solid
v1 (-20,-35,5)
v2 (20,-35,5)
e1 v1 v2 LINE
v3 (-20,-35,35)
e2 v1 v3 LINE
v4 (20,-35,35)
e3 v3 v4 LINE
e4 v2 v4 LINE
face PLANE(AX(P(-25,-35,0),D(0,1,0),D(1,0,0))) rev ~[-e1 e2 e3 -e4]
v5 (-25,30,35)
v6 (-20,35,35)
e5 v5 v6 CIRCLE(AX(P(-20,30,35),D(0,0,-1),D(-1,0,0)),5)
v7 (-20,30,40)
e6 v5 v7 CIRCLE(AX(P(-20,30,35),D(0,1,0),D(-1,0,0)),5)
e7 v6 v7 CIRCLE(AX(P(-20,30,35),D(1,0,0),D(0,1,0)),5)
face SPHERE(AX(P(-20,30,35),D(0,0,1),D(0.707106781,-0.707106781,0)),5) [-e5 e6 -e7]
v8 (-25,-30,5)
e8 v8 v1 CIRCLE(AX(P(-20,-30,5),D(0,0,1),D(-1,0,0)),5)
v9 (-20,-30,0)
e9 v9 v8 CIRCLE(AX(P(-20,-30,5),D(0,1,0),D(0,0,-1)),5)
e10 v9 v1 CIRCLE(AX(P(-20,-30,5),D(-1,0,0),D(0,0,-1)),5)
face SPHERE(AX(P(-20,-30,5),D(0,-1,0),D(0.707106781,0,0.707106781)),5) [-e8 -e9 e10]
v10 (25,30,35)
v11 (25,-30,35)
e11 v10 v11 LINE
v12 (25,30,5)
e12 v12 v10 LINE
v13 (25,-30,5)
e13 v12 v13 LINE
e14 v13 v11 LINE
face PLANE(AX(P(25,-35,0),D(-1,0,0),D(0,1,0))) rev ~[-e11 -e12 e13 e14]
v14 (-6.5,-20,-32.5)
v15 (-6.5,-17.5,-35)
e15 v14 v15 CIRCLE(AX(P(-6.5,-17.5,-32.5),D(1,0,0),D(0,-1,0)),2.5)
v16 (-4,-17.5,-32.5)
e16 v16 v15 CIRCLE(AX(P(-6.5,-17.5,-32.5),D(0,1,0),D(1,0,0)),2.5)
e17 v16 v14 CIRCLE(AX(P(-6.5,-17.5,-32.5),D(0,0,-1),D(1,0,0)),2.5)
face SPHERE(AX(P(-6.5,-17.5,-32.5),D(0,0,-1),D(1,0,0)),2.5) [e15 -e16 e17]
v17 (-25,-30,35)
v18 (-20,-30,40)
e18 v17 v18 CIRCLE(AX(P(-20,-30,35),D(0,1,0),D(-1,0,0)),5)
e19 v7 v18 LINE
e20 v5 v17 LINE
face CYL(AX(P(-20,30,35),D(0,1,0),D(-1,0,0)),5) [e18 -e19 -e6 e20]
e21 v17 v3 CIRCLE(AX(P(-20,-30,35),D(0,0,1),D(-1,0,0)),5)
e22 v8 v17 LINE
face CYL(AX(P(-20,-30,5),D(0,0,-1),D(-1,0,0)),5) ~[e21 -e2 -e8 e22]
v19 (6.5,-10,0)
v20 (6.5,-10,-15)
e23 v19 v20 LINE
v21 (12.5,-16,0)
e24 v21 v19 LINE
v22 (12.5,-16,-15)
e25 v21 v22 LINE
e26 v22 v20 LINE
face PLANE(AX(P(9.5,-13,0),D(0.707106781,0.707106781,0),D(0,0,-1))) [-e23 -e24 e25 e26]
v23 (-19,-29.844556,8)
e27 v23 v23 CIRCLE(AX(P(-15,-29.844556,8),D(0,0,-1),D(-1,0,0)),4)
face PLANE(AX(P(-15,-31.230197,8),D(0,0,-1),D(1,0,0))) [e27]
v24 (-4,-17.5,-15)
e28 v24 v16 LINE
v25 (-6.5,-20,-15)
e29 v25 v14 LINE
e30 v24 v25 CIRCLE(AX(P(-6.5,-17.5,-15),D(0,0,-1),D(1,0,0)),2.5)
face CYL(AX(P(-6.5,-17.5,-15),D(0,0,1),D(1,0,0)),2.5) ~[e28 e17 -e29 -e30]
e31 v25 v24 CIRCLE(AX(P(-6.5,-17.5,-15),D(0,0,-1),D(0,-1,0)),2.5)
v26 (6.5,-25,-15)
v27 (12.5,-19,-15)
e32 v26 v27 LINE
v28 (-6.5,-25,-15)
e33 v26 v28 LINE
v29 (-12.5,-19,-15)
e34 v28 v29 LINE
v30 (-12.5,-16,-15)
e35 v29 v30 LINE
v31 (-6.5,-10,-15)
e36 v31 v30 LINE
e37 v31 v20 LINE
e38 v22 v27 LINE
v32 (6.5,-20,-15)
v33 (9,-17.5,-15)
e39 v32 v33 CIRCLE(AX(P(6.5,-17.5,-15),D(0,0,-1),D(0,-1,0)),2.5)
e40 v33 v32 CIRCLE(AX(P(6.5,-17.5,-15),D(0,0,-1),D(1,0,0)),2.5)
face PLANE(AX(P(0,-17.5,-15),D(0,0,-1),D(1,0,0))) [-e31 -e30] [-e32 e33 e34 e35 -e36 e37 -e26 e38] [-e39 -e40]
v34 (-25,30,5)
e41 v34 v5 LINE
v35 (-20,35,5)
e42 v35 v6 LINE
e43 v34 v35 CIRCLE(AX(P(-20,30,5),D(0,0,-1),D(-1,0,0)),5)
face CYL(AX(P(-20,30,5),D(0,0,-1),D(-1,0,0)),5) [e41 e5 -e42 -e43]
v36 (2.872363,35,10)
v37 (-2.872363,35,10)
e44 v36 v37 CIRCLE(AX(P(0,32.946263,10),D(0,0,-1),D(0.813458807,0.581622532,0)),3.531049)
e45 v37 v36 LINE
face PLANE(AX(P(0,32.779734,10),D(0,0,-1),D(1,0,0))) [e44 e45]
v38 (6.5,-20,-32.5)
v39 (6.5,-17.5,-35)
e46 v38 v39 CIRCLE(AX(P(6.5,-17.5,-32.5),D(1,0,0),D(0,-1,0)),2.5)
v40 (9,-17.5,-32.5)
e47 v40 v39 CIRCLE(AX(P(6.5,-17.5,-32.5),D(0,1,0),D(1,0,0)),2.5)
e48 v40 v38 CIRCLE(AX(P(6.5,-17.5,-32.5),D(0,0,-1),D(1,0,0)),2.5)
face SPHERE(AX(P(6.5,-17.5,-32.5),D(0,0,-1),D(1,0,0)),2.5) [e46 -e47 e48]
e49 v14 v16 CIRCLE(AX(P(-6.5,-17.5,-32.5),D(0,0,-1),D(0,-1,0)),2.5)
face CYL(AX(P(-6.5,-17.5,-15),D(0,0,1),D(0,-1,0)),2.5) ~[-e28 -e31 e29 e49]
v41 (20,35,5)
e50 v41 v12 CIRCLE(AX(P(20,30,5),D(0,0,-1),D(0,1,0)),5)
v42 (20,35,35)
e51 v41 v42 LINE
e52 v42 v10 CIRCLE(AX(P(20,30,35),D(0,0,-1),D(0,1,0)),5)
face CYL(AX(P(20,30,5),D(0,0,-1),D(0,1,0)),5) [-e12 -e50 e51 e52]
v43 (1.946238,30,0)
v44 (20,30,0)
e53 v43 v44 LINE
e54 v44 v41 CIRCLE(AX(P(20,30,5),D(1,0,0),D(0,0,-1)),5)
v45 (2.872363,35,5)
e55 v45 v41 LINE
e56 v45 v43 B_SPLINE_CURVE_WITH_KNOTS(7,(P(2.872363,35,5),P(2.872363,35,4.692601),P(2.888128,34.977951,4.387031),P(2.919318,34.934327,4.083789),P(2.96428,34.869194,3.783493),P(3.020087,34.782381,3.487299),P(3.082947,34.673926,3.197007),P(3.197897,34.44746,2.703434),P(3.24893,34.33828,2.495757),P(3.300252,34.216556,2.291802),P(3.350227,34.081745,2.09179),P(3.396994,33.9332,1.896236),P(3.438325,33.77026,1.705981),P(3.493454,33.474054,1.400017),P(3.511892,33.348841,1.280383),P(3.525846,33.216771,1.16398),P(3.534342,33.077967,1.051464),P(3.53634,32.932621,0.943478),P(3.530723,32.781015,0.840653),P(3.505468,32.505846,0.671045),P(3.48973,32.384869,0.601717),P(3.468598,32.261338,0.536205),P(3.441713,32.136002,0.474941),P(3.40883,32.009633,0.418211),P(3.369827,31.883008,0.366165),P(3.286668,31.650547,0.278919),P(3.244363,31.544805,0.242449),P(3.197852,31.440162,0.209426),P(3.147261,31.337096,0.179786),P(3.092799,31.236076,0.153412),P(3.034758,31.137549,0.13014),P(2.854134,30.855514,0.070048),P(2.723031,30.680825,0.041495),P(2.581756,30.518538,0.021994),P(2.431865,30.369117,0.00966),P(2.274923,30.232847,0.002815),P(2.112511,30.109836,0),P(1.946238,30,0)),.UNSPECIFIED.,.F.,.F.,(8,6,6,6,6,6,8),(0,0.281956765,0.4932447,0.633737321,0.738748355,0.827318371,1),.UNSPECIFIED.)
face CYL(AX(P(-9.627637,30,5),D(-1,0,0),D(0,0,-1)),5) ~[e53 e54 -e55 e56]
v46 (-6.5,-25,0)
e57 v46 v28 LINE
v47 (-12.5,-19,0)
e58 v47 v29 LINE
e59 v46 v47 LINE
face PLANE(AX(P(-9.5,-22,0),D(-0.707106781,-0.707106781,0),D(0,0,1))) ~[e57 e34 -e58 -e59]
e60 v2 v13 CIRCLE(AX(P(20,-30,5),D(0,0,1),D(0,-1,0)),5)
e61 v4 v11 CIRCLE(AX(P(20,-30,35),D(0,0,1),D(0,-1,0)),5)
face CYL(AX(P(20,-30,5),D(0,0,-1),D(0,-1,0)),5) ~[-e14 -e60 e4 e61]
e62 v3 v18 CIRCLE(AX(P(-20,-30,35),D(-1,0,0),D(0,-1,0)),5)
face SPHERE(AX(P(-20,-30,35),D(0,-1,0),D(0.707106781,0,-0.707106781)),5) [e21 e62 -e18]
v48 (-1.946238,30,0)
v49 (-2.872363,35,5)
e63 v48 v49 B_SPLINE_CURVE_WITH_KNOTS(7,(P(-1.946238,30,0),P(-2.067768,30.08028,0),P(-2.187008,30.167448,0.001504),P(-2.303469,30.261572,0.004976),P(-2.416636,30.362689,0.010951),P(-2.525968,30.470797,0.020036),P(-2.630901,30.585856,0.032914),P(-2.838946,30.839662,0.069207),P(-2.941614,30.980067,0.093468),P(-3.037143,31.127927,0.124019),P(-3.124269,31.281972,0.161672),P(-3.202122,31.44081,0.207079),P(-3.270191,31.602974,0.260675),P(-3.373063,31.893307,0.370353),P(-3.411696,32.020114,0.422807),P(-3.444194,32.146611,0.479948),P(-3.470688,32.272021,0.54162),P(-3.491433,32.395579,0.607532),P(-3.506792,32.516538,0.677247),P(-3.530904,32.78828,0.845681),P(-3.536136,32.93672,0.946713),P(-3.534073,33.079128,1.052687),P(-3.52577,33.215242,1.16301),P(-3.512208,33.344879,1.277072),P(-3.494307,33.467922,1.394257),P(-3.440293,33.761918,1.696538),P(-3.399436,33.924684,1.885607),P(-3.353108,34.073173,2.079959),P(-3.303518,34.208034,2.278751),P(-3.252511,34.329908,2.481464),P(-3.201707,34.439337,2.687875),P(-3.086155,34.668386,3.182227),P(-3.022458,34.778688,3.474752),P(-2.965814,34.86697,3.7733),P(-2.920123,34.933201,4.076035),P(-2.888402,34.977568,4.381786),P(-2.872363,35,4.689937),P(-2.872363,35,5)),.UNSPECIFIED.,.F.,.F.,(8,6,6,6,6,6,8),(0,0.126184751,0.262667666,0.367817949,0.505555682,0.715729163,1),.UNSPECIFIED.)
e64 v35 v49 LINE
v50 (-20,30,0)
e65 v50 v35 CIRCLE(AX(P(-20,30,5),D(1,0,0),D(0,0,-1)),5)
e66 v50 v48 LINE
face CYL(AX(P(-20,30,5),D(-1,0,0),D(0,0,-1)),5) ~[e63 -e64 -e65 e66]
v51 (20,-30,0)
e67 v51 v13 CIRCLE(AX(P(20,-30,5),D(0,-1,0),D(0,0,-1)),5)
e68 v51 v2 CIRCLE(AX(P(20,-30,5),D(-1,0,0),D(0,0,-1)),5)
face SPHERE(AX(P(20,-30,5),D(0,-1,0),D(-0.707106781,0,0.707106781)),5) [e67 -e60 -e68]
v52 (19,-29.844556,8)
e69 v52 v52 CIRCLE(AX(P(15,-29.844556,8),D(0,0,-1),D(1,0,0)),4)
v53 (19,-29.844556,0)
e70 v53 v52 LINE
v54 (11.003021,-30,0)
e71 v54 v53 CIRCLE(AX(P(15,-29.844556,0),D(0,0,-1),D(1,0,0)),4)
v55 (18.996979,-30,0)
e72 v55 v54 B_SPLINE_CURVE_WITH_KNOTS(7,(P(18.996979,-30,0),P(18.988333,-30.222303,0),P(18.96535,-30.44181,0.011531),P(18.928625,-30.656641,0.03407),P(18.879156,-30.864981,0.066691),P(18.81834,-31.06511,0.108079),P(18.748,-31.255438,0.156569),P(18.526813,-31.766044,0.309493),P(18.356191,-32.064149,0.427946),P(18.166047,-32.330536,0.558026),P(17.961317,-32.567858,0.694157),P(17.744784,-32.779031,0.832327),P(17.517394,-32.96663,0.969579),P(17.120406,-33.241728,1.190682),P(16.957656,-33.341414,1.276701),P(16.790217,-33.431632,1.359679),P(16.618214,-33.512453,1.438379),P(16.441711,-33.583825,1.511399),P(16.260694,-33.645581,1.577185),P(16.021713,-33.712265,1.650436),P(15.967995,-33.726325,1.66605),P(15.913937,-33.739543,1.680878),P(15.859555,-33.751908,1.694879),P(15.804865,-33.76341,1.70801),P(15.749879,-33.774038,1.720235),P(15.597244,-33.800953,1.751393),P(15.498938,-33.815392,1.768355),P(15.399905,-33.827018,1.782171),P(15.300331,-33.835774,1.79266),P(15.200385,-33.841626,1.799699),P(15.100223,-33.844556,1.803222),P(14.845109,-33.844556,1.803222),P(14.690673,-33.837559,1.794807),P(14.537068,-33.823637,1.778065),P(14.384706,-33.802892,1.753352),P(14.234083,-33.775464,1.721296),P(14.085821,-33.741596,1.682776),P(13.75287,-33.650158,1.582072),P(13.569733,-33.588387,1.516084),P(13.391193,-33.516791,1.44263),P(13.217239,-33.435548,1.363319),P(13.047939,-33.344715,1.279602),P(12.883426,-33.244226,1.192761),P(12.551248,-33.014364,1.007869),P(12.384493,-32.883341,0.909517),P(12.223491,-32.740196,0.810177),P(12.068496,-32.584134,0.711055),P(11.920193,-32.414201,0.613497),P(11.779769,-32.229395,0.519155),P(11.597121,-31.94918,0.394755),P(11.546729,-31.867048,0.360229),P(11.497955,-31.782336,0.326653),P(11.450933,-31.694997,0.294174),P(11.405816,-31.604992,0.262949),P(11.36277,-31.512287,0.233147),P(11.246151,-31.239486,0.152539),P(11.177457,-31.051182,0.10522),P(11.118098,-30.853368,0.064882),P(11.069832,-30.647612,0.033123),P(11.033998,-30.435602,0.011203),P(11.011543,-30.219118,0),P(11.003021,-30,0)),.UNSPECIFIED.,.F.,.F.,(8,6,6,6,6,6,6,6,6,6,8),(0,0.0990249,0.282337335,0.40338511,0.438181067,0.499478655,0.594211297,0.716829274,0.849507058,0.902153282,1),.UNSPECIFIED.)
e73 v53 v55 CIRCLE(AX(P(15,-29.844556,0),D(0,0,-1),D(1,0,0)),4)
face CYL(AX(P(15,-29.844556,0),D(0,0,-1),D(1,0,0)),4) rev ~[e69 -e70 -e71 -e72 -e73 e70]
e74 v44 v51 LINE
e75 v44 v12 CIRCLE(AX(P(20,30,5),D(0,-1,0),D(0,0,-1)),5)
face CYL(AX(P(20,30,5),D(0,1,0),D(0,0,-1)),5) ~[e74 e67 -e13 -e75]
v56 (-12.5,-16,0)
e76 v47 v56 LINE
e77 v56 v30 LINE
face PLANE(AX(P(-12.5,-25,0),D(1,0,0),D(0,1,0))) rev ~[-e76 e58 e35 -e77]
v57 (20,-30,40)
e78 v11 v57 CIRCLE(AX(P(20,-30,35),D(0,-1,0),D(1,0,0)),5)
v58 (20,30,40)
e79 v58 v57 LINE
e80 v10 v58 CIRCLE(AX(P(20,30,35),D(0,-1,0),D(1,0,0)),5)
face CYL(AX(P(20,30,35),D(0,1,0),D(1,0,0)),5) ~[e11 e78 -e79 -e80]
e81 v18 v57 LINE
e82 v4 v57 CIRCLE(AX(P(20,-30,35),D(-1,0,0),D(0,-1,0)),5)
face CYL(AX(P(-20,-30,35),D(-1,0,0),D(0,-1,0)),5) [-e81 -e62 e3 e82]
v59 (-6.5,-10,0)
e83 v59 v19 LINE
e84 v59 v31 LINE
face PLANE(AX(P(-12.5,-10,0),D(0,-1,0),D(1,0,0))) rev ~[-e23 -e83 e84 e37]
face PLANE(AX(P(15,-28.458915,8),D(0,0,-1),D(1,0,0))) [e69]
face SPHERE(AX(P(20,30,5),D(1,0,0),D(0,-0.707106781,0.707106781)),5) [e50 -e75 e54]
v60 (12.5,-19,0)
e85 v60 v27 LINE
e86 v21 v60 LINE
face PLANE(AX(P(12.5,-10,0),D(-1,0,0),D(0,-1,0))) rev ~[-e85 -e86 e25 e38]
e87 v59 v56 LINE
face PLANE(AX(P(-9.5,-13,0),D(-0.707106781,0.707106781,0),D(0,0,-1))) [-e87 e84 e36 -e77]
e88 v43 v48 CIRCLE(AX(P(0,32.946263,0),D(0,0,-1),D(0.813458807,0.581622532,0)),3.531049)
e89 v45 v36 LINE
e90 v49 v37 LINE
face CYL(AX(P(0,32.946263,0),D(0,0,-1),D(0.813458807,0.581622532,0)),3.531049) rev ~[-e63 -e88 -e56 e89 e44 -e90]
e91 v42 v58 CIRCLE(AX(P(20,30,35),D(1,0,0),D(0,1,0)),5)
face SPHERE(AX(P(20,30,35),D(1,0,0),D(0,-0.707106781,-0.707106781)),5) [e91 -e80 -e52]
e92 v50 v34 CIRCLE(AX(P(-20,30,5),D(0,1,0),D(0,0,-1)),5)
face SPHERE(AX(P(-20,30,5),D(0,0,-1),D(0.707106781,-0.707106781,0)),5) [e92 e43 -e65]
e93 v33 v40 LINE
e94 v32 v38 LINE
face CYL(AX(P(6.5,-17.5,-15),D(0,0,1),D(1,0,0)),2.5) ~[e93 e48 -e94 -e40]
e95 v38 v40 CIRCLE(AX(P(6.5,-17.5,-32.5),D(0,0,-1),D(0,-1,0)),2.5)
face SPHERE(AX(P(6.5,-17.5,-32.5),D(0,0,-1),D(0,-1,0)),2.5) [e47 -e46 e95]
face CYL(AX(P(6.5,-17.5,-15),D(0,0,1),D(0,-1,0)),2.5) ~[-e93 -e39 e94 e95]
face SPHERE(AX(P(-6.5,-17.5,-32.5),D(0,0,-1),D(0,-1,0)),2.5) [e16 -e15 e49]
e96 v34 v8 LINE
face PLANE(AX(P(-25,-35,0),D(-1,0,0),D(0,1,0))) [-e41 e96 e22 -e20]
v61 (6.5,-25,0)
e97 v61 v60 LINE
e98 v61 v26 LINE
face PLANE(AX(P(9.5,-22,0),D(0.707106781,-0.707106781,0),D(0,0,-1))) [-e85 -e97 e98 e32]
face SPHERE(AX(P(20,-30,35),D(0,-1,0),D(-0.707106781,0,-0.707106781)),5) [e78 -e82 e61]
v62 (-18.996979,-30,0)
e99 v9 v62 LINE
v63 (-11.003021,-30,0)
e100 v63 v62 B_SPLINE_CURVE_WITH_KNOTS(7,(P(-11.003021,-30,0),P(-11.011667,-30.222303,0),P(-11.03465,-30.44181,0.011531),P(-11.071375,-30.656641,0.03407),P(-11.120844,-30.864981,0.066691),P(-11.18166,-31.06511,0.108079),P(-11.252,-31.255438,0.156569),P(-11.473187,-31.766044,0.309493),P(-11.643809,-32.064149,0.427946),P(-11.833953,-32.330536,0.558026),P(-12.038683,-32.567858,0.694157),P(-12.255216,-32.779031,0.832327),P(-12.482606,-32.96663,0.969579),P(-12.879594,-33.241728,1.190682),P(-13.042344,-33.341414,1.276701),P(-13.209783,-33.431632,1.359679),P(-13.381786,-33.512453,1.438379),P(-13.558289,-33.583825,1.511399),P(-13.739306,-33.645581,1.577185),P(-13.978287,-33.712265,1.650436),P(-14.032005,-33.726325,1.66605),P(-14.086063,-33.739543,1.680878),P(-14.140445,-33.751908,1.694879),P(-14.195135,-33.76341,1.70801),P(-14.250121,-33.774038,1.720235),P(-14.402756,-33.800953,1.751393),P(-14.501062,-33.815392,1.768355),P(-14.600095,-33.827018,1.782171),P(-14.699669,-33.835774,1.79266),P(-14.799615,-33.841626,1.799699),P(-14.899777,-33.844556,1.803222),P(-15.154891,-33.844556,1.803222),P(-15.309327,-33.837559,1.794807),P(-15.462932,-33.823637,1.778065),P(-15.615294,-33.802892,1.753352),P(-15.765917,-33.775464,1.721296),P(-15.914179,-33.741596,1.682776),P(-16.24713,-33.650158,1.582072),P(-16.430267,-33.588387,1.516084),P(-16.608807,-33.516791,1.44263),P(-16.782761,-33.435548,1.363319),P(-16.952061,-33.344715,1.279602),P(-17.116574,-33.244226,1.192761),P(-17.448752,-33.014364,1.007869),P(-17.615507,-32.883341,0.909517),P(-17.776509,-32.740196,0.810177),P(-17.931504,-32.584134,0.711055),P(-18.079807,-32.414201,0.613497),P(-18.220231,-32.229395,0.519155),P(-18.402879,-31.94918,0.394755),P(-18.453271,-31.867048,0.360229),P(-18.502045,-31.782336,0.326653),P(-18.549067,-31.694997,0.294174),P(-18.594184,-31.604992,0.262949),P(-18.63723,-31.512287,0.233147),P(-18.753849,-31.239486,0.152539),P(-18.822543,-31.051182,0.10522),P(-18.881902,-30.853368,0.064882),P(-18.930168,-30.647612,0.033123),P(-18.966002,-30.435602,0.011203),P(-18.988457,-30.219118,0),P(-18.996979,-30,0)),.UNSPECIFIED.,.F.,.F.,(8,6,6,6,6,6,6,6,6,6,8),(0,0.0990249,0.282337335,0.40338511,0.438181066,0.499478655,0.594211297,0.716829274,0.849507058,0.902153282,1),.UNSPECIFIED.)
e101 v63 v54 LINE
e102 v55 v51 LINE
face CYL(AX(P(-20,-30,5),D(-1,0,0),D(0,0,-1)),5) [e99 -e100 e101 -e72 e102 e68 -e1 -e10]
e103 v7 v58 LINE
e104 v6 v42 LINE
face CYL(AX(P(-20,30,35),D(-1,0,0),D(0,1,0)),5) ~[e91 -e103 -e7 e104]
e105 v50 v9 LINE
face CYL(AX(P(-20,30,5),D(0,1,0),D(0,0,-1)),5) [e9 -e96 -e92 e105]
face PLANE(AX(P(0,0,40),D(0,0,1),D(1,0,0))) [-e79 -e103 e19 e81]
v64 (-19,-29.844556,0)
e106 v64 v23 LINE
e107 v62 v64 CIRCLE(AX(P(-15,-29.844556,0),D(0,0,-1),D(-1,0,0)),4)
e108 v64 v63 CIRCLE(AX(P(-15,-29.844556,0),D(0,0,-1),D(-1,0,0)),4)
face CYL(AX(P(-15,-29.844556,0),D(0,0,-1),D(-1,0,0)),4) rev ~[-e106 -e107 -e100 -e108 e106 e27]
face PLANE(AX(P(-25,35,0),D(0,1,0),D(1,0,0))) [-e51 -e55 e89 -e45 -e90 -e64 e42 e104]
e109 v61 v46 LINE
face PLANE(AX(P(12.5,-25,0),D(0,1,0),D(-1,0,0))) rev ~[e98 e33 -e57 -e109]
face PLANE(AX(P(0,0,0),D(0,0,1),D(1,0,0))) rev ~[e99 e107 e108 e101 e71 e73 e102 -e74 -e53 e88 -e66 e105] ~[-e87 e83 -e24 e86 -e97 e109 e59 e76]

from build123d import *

# Parameters (mm, degrees)
F0_W          = 50
F0_H          = 70
F1_DEPTH      = 40
F3_DEPTH      = 15
F4_SIZE       = 6
F6_DEPTH      = 20
F7_DEPTH      = 20
F8_R          = 2.5
F10_DEPTH     = 10
F12_DEPTH     = 8
F13_T1_DEPTH  = 60
F13_T3_DEPTH  = 30
F13_T5_DEPTH  = 29.6276373277
F13_T7_DEPTH  = 29.6276373277
F13_T9_DEPTH  = 40
F13_S13_W     = 5
F13_S13_H     = 5
F13_T14_DEPTH = 5
F13_S19_W     = 5
F13_S19_H     = 5
F13_T20_DEPTH = 5
F13_S25_W     = 5
F13_S25_H     = 5
F13_T26_DEPTH = 5
F13_S31_W     = 5
F13_S31_H     = 5
F13_T32_DEPTH = 5
F13_S37_W     = 5
F13_S37_H     = 5
F13_T38_DEPTH = 5
F13_S43_W     = 5
F13_S43_H     = 5
F13_T44_DEPTH = 5
F13_S49_W     = 5
F13_S49_H     = 5
F13_T50_DEPTH = 5
F13_S55_W     = 5
F13_S55_H     = 5
F13_T56_DEPTH = 5


# Not quite as in the source:
# - a fillet or chamfer that OpenCascade refuses, or shapes differently, is made with other operations: its cross-section is extruded or revolved along the edge and cut away or added


with BuildPart() as f1:
    # F0 (on Top) → F1 (new body)
    with BuildSketch(Plane.XY):
        Rectangle(F0_W, F0_H)
    extrude(amount=F1_DEPTH)

    # F2 (on face) → F3 (join)
    with BuildSketch(Plane(origin=(0, 0, 0), x_dir=(1, 0, 0), z_dir=(0, 0, -1))):
        Polygon((-12.5, 25), (-12.5, 20), (-12.5, 10), (12.5, 10), (12.5, 17.5), (12.5, 25), align=None)
    extrude(amount=F3_DEPTH)

    # F4
    f4_edges = [f1.edges().sort_by_distance(p)[0] for p in [
        (-12.5, -25, -7.5),
        (-12.5, -10, -7.5),
        (12.5, -10, -7.5),
        (12.5, -25, -7.5),
    ]]
    chamfer(f4_edges, length=F4_SIZE)

    # F5 (on face) → F6 (join)
    with BuildSketch(Plane(origin=(0, 0, -15), x_dir=(1, 0, 0), z_dir=(0, 0, -1))):
        with BuildLine():
            ThreePointArc((-4, 17.5), (-4.732233047, 19.267766953), (-6.5, 20))
            ThreePointArc((-6.5, 20), (-8.267766953, 15.732233047), (-4, 17.5))
        make_face()
    extrude(amount=F6_DEPTH)

    # F5 (on face) → F7 (join)
    with BuildSketch(Plane(origin=(0, 0, -15), x_dir=(1, 0, 0), z_dir=(0, 0, -1))):
        with BuildLine():
            ThreePointArc((9, 17.5), (8.267766953, 19.267766953), (6.5, 20))
            ThreePointArc((6.5, 20), (4.732233047, 15.732233047), (9, 17.5))
        make_face()
    extrude(amount=F7_DEPTH)

    # F8
    f8_edges = [f1.edges().sort_by_distance(p)[0] for p in [
        (-9, -17.5, -35),
        (4, -17.5, -35),
    ]]
    fillet(f8_edges, radius=F8_R)

    # F9 (on face) → F10 (cut)
    with BuildSketch(Plane(origin=(0, 0, 0), x_dir=(1, 0, 0), z_dir=(0, 0, -1))):
        with BuildLine():
            Line((-2.8723626723, -35), (2.8723626723, -35))
            ThreePointArc((2.8723626723, -35), (0, -29.4152137969), (-2.8723626723, -35))
        make_face()
    extrude(amount=-F10_DEPTH, mode=Mode.SUBTRACT)

    # F11 (on face) → F12 (cut)
    with BuildSketch(Plane(origin=(0, 0, 0), x_dir=(1, 0, 0), z_dir=(0, 0, -1))):
        with BuildLine():
            ThreePointArc((11, 29.8445560038), (15, 25.8445560038), (19, 29.8445560038))
            Line((19, 29.8445560038), (15, 29.8445560038))
            Line((15, 29.8445560038), (11, 29.8445560038))
        make_face()
        with BuildLine():
            Line((-15, 29.8445560038), (-11, 29.8445560038))
            ThreePointArc((-11, 29.8445560038), (-15, 33.8445560038), (-19, 29.8445560038))
            Line((-19, 29.8445560038), (-15, 29.8445560038))
        make_face()
        with BuildLine():
            ThreePointArc((-19, 29.8445560038), (-15, 25.8445560038), (-11, 29.8445560038))
            Line((-11, 29.8445560038), (-15, 29.8445560038))
            Line((-15, 29.8445560038), (-19, 29.8445560038))
        make_face()
        with BuildLine():
            Line((15, 29.8445560038), (19, 29.8445560038))
            ThreePointArc((19, 29.8445560038), (15, 33.8445560038), (11, 29.8445560038))
            Line((11, 29.8445560038), (15, 29.8445560038))
        make_face()
    extrude(amount=-F12_DEPTH, mode=Mode.SUBTRACT)

    # F13: fillet of radius 5 on 13 edges, made by hand

    # F13_s2 → F13_t1 (cut)
    with BuildSketch(Plane.XZ.offset(-30)):
        with BuildLine():
            ThreePointArc((20, 0), (23.5355339059, 1.4644660941), (25, 5))
            Line((25, 5), (25, 0))
            Line((25, 0), (20, 0))
        make_face()
        with BuildLine():
            ThreePointArc((25, 35), (23.5355339059, 38.5355339059), (20, 40))
            Line((20, 40), (25, 40))
            Line((25, 40), (25, 35))
        make_face()
        with BuildLine():
            ThreePointArc((-20, 0), (-23.5355339059, 1.4644660941), (-25, 5))
            Line((-25, 5), (-25, 0))
            Line((-25, 0), (-20, 0))
        make_face()
        with BuildLine():
            ThreePointArc((-25, 35), (-23.5355339059, 38.5355339059), (-20, 40))
            Line((-20, 40), (-25, 40))
            Line((-25, 40), (-25, 35))
        make_face()
    extrude(amount=F13_T1_DEPTH, mode=Mode.SUBTRACT)

    # F13_s4 → F13_t3 (cut)
    with BuildSketch(Plane.XY.offset(5)):
        with BuildLine():
            ThreePointArc((20, -35), (23.5355339059, -33.5355339059), (25, -30))
            Line((25, -30), (25, -35))
            Line((25, -35), (20, -35))
        make_face()
        with BuildLine():
            ThreePointArc((20, 35), (23.5355339059, 33.5355339059), (25, 30))
            Line((25, 30), (25, 35))
            Line((25, 35), (20, 35))
        make_face()
        with BuildLine():
            ThreePointArc((-25, -30), (-23.5355339059, -33.5355339059), (-20, -35))
            Line((-20, -35), (-25, -35))
            Line((-25, -35), (-25, -30))
        make_face()
        with BuildLine():
            ThreePointArc((-25, 30), (-23.5355339059, 33.5355339059), (-20, 35))
            Line((-20, 35), (-25, 35))
            Line((-25, 35), (-25, 30))
        make_face()
    extrude(amount=F13_T3_DEPTH, mode=Mode.SUBTRACT)

    # F13_s6 → F13_t5 (cut)
    with BuildSketch(Plane.YZ.offset(-9.6276373277)):
        with BuildLine():
            ThreePointArc((30, 0), (33.5355339059, 1.4644660941), (35, 5))
            Line((35, 5), (35, 0))
            Line((35, 0), (30, 0))
        make_face()
    extrude(amount=F13_T5_DEPTH, mode=Mode.SUBTRACT)

    # F13_s8 → F13_t7 (cut)
    with BuildSketch(Plane.YZ.offset(-20)):
        with BuildLine():
            ThreePointArc((30, 0), (33.5355339059, 1.4644660941), (35, 5))
            Line((35, 5), (35, 0))
            Line((35, 0), (30, 0))
        make_face()
    extrude(amount=F13_T7_DEPTH, mode=Mode.SUBTRACT)

    # F13_s10 → F13_t9 (cut)
    with BuildSketch(Plane.YZ.offset(-20)):
        with BuildLine():
            ThreePointArc((-30, 0), (-33.5355339059, 1.4644660941), (-35, 5))
            Line((-35, 5), (-35, 0))
            Line((-35, 0), (-30, 0))
        make_face()
        with BuildLine():
            ThreePointArc((-35, 35), (-33.5355339059, 38.5355339059), (-30, 40))
            Line((-30, 40), (-35, 40))
            Line((-35, 40), (-35, 35))
        make_face()
        with BuildLine():
            ThreePointArc((35, 35), (33.5355339059, 38.5355339059), (30, 40))
            Line((30, 40), (35, 40))
            Line((35, 40), (35, 35))
        make_face()
    extrude(amount=F13_T9_DEPTH, mode=Mode.SUBTRACT)


with BuildPart() as f13_tool12:
    # F13_s13 → F13_t14 (new body)
    with BuildSketch(Plane.XZ.offset(30)):
        with Locations((22.5, 2.5)):
            Rectangle(F13_S13_W, F13_S13_H)
    extrude(amount=F13_T14_DEPTH)

    # F13_s15 → F13_t16 (revolve, cut)
    with BuildSketch(Plane(origin=(20, -30, 5), x_dir=(-0.7071067812, 0, 0.7071067812), z_dir=(0.7071067812, 0, 0.7071067812))):
        with BuildLine():
            ThreePointArc((0, -5), (5, 0), (0, 5))
            Line((0, 5), (0, -5))
        make_face()
    revolve(axis=Axis((20, -30, 5), (0, -1, 0)), mode=Mode.SUBTRACT)


with BuildPart() as f1_1:
    add(f1.part)

    # F13_t11: cut F13_tool12
    add(f13_tool12.part, mode=Mode.SUBTRACT)


with BuildPart() as f13_tool18:
    # F13_s19 → F13_t20 (new body)
    with BuildSketch(Plane.YZ.offset(20)):
        with Locations((32.5, 2.5)):
            Rectangle(F13_S19_W, F13_S19_H)
    extrude(amount=F13_T20_DEPTH)

    # F13_s21 → F13_t22 (revolve, cut)
    with BuildSketch(Plane(origin=(20, 30, 5), x_dir=(0, -0.7071067812, 0.7071067812), z_dir=(0, 0.7071067812, 0.7071067812))):
        with BuildLine():
            ThreePointArc((0, -5), (5, 0), (0, 5))
            Line((0, 5), (0, -5))
        make_face()
    revolve(axis=Axis((20, 30, 5), (1, 0, 0)), mode=Mode.SUBTRACT)


with BuildPart() as f1_2:
    add(f1_1.part)

    # F13_t17: cut F13_tool18
    add(f13_tool18.part, mode=Mode.SUBTRACT)


with BuildPart() as f13_tool24:
    # F13_s25 → F13_t26 (new body)
    with BuildSketch(Plane.XZ.offset(30)):
        with Locations((22.5, 37.5)):
            Rectangle(F13_S25_W, F13_S25_H)
    extrude(amount=F13_T26_DEPTH)

    # F13_s27 → F13_t28 (revolve, cut)
    with BuildSketch(Plane(origin=(20, -30, 35), x_dir=(-0.7071067812, 0, -0.7071067812), z_dir=(-0.7071067812, 0, 0.7071067812))):
        with BuildLine():
            ThreePointArc((0, -5), (5, 0), (0, 5))
            Line((0, 5), (0, -5))
        make_face()
    revolve(axis=Axis((20, -30, 35), (0, -1, 0)), mode=Mode.SUBTRACT)


with BuildPart() as f1_3:
    add(f1_2.part)

    # F13_t23: cut F13_tool24
    add(f13_tool24.part, mode=Mode.SUBTRACT)


with BuildPart() as f13_tool30:
    # F13_s31 → F13_t32 (new body)
    with BuildSketch(Plane.YZ.offset(20)):
        with Locations((32.5, 37.5)):
            Rectangle(F13_S31_W, F13_S31_H)
    extrude(amount=F13_T32_DEPTH)

    # F13_s33 → F13_t34 (revolve, cut)
    with BuildSketch(Plane(origin=(20, 30, 35), x_dir=(0, -0.7071067812, -0.7071067812), z_dir=(0, -0.7071067812, 0.7071067812))):
        with BuildLine():
            ThreePointArc((0, -5), (5, 0), (0, 5))
            Line((0, 5), (0, -5))
        make_face()
    revolve(axis=Axis((20, 30, 35), (1, 0, 0)), mode=Mode.SUBTRACT)


with BuildPart() as f1_4:
    add(f1_3.part)

    # F13_t29: cut F13_tool30
    add(f13_tool30.part, mode=Mode.SUBTRACT)


with BuildPart() as f13_tool36:
    # F13_s37 → F13_t38 (new body)
    with BuildSketch(Plane.XY.offset(5)):
        with Locations((-22.5, 32.5)):
            Rectangle(F13_S37_W, F13_S37_H)
    extrude(amount=-F13_T38_DEPTH)

    # F13_s39 → F13_t40 (revolve, cut)
    with BuildSketch(Plane(origin=(-20, 30, 5), x_dir=(0.7071067812, -0.7071067812, 0), z_dir=(0.7071067812, 0.7071067812, 0))):
        with BuildLine():
            ThreePointArc((0, -5), (5, 0), (0, 5))
            Line((0, 5), (0, -5))
        make_face()
    revolve(axis=Axis((-20, 30, 5), (0, 0, -1)), mode=Mode.SUBTRACT)


with BuildPart() as f1_5:
    add(f1_4.part)

    # F13_t35: cut F13_tool36
    add(f13_tool36.part, mode=Mode.SUBTRACT)


with BuildPart() as f13_tool42:
    # F13_s43 → F13_t44 (new body)
    with BuildSketch(Plane.XZ.offset(30)):
        with Locations((-22.5, 2.5)):
            Rectangle(F13_S43_W, F13_S43_H)
    extrude(amount=F13_T44_DEPTH)

    # F13_s45 → F13_t46 (revolve, cut)
    with BuildSketch(Plane(origin=(-20, -30, 5), x_dir=(0.7071067812, 0, 0.7071067812), z_dir=(0.7071067812, 0, -0.7071067812))):
        with BuildLine():
            ThreePointArc((0, -5), (5, 0), (0, 5))
            Line((0, 5), (0, -5))
        make_face()
    revolve(axis=Axis((-20, -30, 5), (0, -1, 0)), mode=Mode.SUBTRACT)


with BuildPart() as f1_6:
    add(f1_5.part)

    # F13_t41: cut F13_tool42
    add(f13_tool42.part, mode=Mode.SUBTRACT)


with BuildPart() as f13_tool48:
    # F13_s49 → F13_t50 (new body)
    with BuildSketch(Plane.XZ.offset(30)):
        with Locations((-22.5, 37.5)):
            Rectangle(F13_S49_W, F13_S49_H)
    extrude(amount=F13_T50_DEPTH)

    # F13_s51 → F13_t52 (revolve, cut)
    with BuildSketch(Plane(origin=(-20, -30, 35), x_dir=(0.7071067812, 0, -0.7071067812), z_dir=(-0.7071067812, 0, -0.7071067812))):
        with BuildLine():
            ThreePointArc((0, -5), (5, 0), (0, 5))
            Line((0, 5), (0, -5))
        make_face()
    revolve(axis=Axis((-20, -30, 35), (0, -1, 0)), mode=Mode.SUBTRACT)


with BuildPart() as f1_7:
    add(f1_6.part)

    # F13_t47: cut F13_tool48
    add(f13_tool48.part, mode=Mode.SUBTRACT)


with BuildPart() as f13_tool54:
    # F13_s55 → F13_t56 (new body)
    with BuildSketch(Plane.XY.offset(35)):
        with Locations((-22.5, 32.5)):
            Rectangle(F13_S55_W, F13_S55_H)
    extrude(amount=F13_T56_DEPTH)

    # F13_s57 → F13_t58 (revolve, cut)
    with BuildSketch(Plane(origin=(-20, 30, 35), x_dir=(0.7071067812, -0.7071067812, 0), z_dir=(-0.7071067812, -0.7071067812, 0))):
        with BuildLine():
            ThreePointArc((0, -5), (5, 0), (0, 5))
            Line((0, 5), (0, -5))
        make_face()
    revolve(axis=Axis((-20, 30, 35), (0, 0, 1)), mode=Mode.SUBTRACT)


with BuildPart() as f1_8:
    add(f1_7.part)

    # F13_t53: cut F13_tool54
    add(f13_tool54.part, mode=Mode.SUBTRACT)


solid = f1_8.part
